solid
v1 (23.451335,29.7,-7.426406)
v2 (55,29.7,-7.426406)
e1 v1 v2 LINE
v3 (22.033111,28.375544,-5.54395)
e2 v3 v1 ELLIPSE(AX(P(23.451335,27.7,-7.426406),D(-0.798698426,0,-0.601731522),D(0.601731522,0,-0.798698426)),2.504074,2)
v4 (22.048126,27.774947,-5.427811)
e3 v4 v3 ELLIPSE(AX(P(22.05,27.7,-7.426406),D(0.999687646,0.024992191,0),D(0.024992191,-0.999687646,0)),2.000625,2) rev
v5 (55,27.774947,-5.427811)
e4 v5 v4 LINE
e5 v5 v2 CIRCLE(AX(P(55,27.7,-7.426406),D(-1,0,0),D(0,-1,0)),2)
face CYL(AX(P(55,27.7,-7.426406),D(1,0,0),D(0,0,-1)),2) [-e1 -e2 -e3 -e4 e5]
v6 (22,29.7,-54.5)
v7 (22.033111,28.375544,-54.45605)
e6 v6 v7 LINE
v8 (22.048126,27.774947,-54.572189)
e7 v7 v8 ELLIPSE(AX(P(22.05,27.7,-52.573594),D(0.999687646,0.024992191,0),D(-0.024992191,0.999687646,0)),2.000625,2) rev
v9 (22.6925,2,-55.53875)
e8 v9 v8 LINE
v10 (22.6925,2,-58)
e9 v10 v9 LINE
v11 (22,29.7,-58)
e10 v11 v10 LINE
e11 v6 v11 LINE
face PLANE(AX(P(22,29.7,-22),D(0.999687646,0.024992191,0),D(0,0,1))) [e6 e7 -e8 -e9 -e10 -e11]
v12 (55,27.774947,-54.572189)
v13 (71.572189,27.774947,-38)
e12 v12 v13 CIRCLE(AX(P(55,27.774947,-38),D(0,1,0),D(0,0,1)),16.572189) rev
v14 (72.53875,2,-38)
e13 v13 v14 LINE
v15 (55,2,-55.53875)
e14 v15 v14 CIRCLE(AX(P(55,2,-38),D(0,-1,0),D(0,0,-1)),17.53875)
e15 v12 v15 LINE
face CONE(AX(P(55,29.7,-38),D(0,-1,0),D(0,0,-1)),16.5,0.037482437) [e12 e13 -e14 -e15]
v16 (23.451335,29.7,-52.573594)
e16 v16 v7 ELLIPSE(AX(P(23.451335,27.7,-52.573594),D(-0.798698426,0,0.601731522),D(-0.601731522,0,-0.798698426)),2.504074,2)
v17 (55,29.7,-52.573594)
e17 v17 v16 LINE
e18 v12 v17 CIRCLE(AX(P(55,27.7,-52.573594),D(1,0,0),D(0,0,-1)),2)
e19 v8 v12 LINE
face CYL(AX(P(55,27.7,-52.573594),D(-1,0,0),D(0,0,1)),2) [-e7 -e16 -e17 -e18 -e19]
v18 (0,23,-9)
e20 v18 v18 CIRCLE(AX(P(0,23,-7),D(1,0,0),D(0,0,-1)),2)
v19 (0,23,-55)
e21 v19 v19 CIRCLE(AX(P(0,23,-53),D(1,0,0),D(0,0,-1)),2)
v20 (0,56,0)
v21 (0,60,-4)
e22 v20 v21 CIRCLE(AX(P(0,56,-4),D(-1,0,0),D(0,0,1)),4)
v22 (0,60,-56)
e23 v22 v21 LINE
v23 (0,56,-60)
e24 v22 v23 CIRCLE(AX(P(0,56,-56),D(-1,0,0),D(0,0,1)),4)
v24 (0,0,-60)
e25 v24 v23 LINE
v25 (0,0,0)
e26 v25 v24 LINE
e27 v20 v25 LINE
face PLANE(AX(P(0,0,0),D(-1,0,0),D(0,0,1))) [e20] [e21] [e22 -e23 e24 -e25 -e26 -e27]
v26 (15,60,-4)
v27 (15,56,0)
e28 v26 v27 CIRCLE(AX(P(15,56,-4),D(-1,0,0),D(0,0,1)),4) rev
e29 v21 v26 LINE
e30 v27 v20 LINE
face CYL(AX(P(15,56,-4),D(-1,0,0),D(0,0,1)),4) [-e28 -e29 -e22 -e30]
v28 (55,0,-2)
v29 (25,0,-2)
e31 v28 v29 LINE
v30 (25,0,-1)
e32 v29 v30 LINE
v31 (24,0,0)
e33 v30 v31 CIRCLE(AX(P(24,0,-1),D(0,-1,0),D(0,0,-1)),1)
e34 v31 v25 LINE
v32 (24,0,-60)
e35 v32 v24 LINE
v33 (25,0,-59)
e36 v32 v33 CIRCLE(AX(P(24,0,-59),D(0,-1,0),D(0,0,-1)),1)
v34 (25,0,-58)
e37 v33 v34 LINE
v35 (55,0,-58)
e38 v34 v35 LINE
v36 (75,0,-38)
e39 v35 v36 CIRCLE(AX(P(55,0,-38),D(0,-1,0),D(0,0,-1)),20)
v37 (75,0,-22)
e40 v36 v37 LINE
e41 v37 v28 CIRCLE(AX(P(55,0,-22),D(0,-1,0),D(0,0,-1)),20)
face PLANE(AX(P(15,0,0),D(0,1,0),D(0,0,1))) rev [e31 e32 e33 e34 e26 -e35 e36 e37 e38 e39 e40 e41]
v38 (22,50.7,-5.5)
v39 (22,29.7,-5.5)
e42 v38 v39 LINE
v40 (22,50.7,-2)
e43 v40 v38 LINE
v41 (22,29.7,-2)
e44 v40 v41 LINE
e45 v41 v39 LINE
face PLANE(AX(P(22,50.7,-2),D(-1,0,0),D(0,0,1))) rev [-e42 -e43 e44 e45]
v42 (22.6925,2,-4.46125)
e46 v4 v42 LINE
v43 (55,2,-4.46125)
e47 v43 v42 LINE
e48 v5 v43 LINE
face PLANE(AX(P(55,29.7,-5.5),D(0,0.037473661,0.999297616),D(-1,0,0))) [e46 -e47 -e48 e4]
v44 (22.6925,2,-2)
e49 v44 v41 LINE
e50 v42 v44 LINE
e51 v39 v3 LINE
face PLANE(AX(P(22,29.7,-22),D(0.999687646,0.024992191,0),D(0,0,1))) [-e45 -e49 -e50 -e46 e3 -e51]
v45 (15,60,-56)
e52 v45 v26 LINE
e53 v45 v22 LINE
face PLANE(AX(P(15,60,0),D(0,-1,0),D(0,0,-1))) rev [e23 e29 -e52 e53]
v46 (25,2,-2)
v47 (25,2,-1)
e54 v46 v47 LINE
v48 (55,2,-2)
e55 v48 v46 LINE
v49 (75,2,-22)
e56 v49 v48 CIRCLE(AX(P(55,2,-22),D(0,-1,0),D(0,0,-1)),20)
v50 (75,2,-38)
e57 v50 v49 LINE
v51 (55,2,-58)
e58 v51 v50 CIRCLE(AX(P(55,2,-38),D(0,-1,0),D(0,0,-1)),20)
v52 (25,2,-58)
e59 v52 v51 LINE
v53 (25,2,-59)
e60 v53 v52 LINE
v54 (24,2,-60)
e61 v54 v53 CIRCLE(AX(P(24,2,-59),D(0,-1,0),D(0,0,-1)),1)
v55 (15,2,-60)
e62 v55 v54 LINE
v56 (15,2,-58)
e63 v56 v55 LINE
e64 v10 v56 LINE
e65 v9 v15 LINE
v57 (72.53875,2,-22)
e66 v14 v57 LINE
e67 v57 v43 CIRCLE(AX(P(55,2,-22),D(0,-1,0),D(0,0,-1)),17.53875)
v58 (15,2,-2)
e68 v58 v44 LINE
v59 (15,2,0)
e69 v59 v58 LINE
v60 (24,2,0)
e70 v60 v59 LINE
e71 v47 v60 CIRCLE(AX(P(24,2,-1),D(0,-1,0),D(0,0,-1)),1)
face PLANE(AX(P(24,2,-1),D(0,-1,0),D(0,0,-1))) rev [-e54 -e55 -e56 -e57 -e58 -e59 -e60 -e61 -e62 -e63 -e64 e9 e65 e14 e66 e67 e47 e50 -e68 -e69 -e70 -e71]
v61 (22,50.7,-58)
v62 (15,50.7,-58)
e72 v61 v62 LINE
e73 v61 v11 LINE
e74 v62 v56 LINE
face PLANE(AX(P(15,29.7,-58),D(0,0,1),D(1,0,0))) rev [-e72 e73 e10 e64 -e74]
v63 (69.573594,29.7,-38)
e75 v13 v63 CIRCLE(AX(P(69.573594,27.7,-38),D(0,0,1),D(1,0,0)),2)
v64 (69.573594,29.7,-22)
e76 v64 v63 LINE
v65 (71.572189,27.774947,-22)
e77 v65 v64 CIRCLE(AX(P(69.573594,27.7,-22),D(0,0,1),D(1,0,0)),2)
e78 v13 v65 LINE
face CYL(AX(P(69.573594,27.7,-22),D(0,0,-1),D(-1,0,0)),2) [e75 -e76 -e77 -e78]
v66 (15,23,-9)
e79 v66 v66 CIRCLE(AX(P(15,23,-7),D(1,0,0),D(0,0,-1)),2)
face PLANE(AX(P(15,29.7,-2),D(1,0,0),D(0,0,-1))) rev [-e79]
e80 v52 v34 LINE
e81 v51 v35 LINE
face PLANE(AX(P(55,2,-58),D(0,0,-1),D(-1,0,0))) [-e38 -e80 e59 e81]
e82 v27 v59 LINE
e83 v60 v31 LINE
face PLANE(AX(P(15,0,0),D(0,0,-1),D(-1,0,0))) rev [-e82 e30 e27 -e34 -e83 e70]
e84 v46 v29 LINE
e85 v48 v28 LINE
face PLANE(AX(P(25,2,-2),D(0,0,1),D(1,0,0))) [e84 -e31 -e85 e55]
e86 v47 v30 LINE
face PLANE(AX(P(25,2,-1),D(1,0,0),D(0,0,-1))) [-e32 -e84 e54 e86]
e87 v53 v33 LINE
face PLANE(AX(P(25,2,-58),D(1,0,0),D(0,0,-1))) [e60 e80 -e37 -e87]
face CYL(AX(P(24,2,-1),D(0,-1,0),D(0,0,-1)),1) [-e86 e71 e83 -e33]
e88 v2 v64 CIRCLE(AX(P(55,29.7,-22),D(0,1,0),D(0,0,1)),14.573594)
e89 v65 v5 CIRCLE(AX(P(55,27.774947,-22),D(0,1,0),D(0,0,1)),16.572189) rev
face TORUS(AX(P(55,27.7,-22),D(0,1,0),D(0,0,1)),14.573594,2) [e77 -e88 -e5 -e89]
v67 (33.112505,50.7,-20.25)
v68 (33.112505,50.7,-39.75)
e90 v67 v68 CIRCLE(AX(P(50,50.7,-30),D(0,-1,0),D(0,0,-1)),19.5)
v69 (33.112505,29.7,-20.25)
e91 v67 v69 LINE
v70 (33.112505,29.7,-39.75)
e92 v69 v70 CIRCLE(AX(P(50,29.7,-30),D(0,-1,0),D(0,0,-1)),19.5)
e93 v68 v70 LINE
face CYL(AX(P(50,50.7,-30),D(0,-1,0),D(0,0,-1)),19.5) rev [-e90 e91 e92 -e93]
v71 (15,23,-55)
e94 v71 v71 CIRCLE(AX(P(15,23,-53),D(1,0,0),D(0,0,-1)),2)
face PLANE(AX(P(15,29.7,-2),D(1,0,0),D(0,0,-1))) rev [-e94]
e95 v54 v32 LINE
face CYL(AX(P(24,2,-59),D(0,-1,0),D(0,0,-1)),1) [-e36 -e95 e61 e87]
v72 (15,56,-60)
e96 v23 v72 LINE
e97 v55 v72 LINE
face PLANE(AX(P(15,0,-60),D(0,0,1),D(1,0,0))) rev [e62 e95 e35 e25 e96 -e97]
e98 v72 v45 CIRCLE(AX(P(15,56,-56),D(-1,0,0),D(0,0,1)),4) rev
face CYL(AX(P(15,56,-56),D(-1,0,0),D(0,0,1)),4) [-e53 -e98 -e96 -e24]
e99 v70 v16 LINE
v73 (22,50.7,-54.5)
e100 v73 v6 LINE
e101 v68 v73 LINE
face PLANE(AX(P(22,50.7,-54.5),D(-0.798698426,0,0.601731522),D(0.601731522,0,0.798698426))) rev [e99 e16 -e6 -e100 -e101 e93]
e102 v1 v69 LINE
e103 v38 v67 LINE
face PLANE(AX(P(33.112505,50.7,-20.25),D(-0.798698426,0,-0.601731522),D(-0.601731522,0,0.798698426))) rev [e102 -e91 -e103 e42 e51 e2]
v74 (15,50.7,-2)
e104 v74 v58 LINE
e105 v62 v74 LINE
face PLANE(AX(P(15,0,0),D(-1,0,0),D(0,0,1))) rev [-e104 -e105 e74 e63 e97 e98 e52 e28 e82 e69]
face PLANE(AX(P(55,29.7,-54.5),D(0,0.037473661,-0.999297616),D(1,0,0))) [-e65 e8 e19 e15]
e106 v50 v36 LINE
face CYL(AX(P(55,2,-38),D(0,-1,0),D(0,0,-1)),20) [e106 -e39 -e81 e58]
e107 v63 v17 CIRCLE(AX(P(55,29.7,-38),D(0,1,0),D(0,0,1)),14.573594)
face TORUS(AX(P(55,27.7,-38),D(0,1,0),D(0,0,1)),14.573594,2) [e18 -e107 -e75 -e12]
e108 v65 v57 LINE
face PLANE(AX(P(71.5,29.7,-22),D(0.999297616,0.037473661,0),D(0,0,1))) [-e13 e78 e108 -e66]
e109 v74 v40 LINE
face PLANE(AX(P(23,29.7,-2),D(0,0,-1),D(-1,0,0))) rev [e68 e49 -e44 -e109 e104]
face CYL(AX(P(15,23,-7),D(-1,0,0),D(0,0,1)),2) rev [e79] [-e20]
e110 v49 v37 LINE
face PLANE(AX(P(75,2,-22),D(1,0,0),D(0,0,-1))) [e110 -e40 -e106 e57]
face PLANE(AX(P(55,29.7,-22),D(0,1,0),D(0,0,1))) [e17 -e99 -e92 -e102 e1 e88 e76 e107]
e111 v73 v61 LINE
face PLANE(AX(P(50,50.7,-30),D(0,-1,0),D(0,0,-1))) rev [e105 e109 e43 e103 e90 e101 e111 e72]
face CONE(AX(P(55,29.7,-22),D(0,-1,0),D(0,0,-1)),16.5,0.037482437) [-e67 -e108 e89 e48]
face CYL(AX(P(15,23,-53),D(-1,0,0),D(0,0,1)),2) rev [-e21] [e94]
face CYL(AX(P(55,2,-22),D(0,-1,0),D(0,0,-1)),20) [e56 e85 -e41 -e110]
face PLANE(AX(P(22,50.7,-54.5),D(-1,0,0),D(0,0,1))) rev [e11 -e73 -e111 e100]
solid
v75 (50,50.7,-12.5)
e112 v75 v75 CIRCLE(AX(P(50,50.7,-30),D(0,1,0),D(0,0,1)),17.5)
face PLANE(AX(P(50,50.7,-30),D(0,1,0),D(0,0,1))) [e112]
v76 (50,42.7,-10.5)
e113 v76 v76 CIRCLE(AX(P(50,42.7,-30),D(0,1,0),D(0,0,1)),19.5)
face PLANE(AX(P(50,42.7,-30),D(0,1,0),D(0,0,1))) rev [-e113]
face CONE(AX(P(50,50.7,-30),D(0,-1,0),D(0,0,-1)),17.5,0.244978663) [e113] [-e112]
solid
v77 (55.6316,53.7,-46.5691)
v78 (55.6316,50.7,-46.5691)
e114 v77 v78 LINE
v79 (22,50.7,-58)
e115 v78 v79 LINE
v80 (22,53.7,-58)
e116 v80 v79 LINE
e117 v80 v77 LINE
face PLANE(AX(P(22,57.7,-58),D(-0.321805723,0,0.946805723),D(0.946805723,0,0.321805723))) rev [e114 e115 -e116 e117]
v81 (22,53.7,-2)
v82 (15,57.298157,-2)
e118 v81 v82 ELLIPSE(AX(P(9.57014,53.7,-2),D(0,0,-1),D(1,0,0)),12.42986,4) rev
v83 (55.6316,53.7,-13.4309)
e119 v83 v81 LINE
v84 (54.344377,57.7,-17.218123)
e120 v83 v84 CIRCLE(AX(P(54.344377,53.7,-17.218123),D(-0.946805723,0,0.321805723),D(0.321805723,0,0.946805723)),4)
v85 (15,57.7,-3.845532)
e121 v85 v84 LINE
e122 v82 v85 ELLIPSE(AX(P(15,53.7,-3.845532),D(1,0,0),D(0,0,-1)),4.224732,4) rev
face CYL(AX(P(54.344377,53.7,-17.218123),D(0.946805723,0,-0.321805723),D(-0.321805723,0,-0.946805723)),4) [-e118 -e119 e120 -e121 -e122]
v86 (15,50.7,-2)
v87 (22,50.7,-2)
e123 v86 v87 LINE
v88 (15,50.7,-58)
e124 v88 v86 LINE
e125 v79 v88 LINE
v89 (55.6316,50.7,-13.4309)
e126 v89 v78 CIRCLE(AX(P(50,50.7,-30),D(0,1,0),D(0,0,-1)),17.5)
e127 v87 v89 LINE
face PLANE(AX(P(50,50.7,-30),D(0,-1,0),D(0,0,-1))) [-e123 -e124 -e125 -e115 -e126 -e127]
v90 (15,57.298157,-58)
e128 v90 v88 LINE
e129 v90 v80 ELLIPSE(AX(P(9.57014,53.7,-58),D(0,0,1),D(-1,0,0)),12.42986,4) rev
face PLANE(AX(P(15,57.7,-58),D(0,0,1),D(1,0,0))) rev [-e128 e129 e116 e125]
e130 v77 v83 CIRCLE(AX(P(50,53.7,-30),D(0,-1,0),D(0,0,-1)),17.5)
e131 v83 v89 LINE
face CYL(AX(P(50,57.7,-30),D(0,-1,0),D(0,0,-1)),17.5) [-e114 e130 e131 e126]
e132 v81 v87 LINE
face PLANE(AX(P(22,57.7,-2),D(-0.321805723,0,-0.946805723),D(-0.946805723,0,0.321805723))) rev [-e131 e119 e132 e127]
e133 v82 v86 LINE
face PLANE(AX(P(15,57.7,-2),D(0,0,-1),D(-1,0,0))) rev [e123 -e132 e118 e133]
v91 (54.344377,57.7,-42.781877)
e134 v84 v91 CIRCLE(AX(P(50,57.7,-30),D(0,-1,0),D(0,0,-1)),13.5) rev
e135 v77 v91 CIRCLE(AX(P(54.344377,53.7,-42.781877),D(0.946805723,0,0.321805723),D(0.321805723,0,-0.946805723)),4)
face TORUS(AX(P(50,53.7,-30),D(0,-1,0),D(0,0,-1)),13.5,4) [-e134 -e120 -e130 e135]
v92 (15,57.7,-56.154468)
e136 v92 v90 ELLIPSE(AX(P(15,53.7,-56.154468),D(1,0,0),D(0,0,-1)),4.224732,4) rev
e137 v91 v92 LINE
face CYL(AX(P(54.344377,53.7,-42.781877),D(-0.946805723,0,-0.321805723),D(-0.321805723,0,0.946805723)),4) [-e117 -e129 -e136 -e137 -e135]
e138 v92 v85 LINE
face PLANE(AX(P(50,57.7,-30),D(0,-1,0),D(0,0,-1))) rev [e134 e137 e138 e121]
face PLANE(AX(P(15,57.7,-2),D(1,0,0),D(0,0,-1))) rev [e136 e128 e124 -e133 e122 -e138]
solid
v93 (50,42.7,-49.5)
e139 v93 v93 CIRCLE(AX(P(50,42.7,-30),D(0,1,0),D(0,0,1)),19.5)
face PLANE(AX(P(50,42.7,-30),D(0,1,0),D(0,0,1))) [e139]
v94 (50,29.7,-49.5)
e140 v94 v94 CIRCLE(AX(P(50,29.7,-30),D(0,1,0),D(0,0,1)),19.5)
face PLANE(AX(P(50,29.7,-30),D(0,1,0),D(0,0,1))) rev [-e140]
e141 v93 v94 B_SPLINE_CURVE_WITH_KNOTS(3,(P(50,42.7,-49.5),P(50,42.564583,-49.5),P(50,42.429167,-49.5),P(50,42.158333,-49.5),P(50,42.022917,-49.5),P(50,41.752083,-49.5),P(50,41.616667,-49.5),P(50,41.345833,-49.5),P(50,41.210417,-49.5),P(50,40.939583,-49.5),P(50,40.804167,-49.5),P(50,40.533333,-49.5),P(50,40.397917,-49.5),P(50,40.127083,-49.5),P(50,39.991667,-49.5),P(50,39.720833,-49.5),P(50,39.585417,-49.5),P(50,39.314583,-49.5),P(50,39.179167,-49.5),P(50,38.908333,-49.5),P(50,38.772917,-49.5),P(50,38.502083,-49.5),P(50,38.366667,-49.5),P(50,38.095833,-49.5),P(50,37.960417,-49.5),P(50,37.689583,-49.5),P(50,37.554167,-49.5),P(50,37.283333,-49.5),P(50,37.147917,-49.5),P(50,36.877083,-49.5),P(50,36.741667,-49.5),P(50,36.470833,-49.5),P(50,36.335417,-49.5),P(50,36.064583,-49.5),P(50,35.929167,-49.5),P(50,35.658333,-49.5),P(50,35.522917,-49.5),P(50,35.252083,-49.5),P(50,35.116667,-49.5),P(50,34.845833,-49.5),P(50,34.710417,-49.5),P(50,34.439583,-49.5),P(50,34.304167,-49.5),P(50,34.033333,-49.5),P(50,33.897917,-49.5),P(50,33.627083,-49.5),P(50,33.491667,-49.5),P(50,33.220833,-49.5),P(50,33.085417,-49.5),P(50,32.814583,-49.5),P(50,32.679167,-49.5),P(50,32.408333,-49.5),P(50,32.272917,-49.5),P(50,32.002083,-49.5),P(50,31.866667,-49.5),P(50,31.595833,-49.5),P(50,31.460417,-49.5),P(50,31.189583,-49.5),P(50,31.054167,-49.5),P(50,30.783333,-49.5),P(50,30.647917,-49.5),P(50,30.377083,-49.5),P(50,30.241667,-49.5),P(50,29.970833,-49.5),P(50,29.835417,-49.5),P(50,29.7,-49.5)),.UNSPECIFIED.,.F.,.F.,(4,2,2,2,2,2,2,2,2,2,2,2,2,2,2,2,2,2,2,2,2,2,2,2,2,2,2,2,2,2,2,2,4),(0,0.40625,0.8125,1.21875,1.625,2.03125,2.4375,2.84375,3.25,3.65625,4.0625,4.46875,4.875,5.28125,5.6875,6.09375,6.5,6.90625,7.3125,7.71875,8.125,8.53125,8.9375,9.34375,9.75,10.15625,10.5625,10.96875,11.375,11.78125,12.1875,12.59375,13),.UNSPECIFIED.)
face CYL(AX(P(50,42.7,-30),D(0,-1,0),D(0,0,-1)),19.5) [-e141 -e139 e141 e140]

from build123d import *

# Parameters (mm, degrees)
ESQUISSE1_W        = 60
ESQUISSE1_H        = 60
ESQUISSE1_R        = 2
BOSS_EXTRU_1_DEPTH = 15
BOSS_EXTRU_2_DEPTH = 2
BOSS_EXTRU_3_DEPTH = 27.7
CHANFREIN1_SIZE    = 1.5
CHANFREIN1_SIZE_2  = 40
CHANFREIN2_SIZE    = 1
CHANFREIN2_SIZE_2  = 40
BOSS_EXTRU_4_DEPTH = 21
ESQUISSE5_R        = 19.5
BOSS_EXTRU_5_DEPTH = 13
ESQUISSE6_R        = 19.5
BOSS_EXTRU_6_DEPTH = 8
CHANFREIN3_SIZE    = 8
CHANFREIN3_SIZE_2  = 2
BOSS_EXTRU_9_DEPTH = 7
CONG_3_R           = 2
CONG_4_R           = 4
CONG_5_R           = 4


with BuildPart() as part:
    # Esquisse1 → Boss.-Extru.1 (new body)
    with BuildSketch(Plane(origin=(0, 0, 0), x_dir=(0, 0, -1), z_dir=(1, 0, 0))):
        with Locations((30, 30)):
            Rectangle(ESQUISSE1_W, ESQUISSE1_H)
        with Locations((7, 23)):
            Circle(ESQUISSE1_R, mode=Mode.SUBTRACT)
        with Locations((53, 23)):
            Circle(ESQUISSE1_R, mode=Mode.SUBTRACT)
    extrude(amount=BOSS_EXTRU_1_DEPTH)

    # Esquisse2 → Boss.-Extru.2 (add)
    with BuildSketch(Plane.XZ):
        with BuildLine():
            Line((15, 0), (24, 0))
            ThreePointArc((24, 0), (24.707106781, -0.292893219), (25, -1))
            Line((25, -1), (25, -2))
            Line((25, -2), (55, -2))
            ThreePointArc((55, -2), (69.142135624, -7.857864376), (75, -22))
            Line((75, -22), (75, -38))
            ThreePointArc((75, -38), (69.142135624, -52.142135624), (55, -58))
            Line((55, -58), (25, -58))
            Line((25, -58), (25, -59))
            ThreePointArc((25, -59), (24.707106781, -59.707106781), (24, -60))
            Line((24, -60), (15, -60))
            Line((15, -60), (15, 0))
        make_face()
    extrude(amount=-BOSS_EXTRU_2_DEPTH)

    # Esquisse3 → Boss.-Extru.3 (add)
    with BuildSketch(Plane(origin=(0, 2, 0), x_dir=(1, 0, 0), z_dir=(0, 1, 0))):
        with BuildLine():
            Line((23, 2), (15, 2))
            Line((15, 2), (15, 58))
            Line((15, 58), (23, 58))
            Line((23, 58), (23, 56))
            Line((23, 56), (55, 56))
            ThreePointArc((55, 56), (67.727922061, 50.727922061), (73, 38))
            Line((73, 38), (73, 22))
            ThreePointArc((73, 22), (67.727922061, 9.272077939), (55, 4))
            Line((55, 4), (23, 4))
            Line((23, 4), (23, 2))
        make_face()
    extrude(amount=BOSS_EXTRU_3_DEPTH)

    # Chanfrein1
    # the kernel refuses this chamfer: 40, 1.5 mm, written as the material it takes off along each edge
    with BuildSketch(Plane(origin=(23, 29.7, -56), x_dir=(0, 0.7157643485721592, 0.6983418914207227), z_dir=(1, 0, 0))) as chanfrein1_piece_1_section:
        Polygon((CHANFREIN1_SIZE * 0.698341891421, CHANFREIN1_SIZE * 0.715764348572), (-CHANFREIN1_SIZE_2 * 0.715764348572, CHANFREIN1_SIZE_2 * 0.698341891421), (0, 0), align=None)
    chanfrein1_piece_1 = extrude(amount=32, mode=Mode.PRIVATE)
    chanfrein1_piece_1 = split(chanfrein1_piece_1, bisect_by=Plane(origin=(37.024131868, 2, -55.4897808), z_dir=(0, 1, 0)), keep=Keep.TOP, mode=Mode.PRIVATE)
    add(chanfrein1_piece_1, mode=Mode.SUBTRACT)
    with BuildSketch(Plane(origin=(55, 29.7, -38), x_dir=(0, 0, -1), z_dir=(-1, 0, 0))) as chanfrein1_piece_2_section:
        Polygon((18 - CHANFREIN1_SIZE, 0), (18, CHANFREIN1_SIZE_2), (18, 0), align=None)
    chanfrein1_piece_2 = revolve(axis=Axis((55, 29.7, -38), (0, -1, 0)), revolution_arc=90, mode=Mode.PRIVATE)
    chanfrein1_piece_2 = split(chanfrein1_piece_2, bisect_by=Plane(origin=(67.098576513, 2, -50.098576513), z_dir=(0, 1, 0)), keep=Keep.TOP, mode=Mode.PRIVATE)
    add(chanfrein1_piece_2, mode=Mode.SUBTRACT)
    with BuildSketch(Plane(origin=(55, 29.7, -4), x_dir=(0, 0.7157643485721598, -0.698341891420722), z_dir=(-1, 0, 0))) as chanfrein1_piece_3_section:
        Polygon((CHANFREIN1_SIZE * 0.698341891421, CHANFREIN1_SIZE * 0.715764348572), (-CHANFREIN1_SIZE_2 * 0.715764348572, CHANFREIN1_SIZE_2 * 0.698341891421), (0, 0), align=None)
    chanfrein1_piece_3 = extrude(amount=32, mode=Mode.PRIVATE)
    chanfrein1_piece_3 = split(chanfrein1_piece_3, bisect_by=Plane(origin=(52.691459865, 2, -4.656531492), z_dir=(0, 1, 0)), keep=Keep.TOP, mode=Mode.PRIVATE)
    add(chanfrein1_piece_3, mode=Mode.SUBTRACT)
    with BuildSketch(Plane(origin=(73, 29.7, -38), x_dir=(-0.6983418914207212, 0.7157643485721609, 0), z_dir=(0, 0, 1))) as chanfrein1_piece_4_section:
        Polygon((CHANFREIN1_SIZE * 0.698341891421, CHANFREIN1_SIZE * 0.715764348572), (-CHANFREIN1_SIZE_2 * 0.715764348572, CHANFREIN1_SIZE_2 * 0.698341891421), (0, 0), align=None)
    chanfrein1_piece_4 = extrude(amount=16, mode=Mode.PRIVATE)
    chanfrein1_piece_4 = split(chanfrein1_piece_4, bisect_by=Plane(origin=(72.334165333, 2, -35.67535471), z_dir=(0, 1, 0)), keep=Keep.TOP, mode=Mode.PRIVATE)
    add(chanfrein1_piece_4, mode=Mode.SUBTRACT)
    with BuildSketch(Plane(origin=(55, 29.7, -22), x_dir=(1, 0, 0), z_dir=(0, 0, -1))) as chanfrein1_piece_5_section:
        Polygon((18 - CHANFREIN1_SIZE, 0), (18, CHANFREIN1_SIZE_2), (18, 0), align=None)
    chanfrein1_piece_5 = revolve(axis=Axis((55, 29.7, -22), (0, -1, 0)), revolution_arc=90, mode=Mode.PRIVATE)
    chanfrein1_piece_5 = split(chanfrein1_piece_5, bisect_by=Plane(origin=(67.098576513, 2, -9.901423487), z_dir=(0, 1, 0)), keep=Keep.TOP, mode=Mode.PRIVATE)
    add(chanfrein1_piece_5, mode=Mode.SUBTRACT)

    # Chanfrein2
    # the kernel refuses this chamfer: 40, 1 mm, written as the material it takes off along each edge
    with BuildSketch(Plane(origin=(23, 29.7, 49.498798633), x_dir=(-0.5451034374320658, 0.8383687986201215, 0), z_dir=(0, 0, -1))) as chanfrein2_piece_1_section:
        Polygon((CHANFREIN2_SIZE * 0.545103437432, -CHANFREIN2_SIZE * 0.83836879862), (-CHANFREIN2_SIZE_2 * 0.83836879862, -CHANFREIN2_SIZE_2 * 0.545103437432), (0, 0), align=None)
    chanfrein2_piece_1 = extrude(amount=211.497597266, mode=Mode.PRIVATE)
    chanfrein2_piece_1 = split(chanfrein2_piece_1, bisect_by=Plane(origin=(22.633717158, 2, -3.549424262), z_dir=(0, 1, 0)), keep=Keep.TOP, mode=Mode.PRIVATE)
    chanfrein2_piece_1 = split(chanfrein2_piece_1, bisect_by=Plane(origin=(22.633717158, 18.944605509, -5.096672707), z_dir=(0, 0.03747366058909413, 0.9992976157091807)), keep=Keep.TOP, mode=Mode.PRIVATE)
    add(chanfrein2_piece_1, mode=Mode.SUBTRACT)
    with BuildSketch(Plane(origin=(23, 29.7, 49.498798633), x_dir=(-0.5451034374320658, 0.8383687986201215, 0), z_dir=(0, 0, -1))) as chanfrein2_piece_2_section:
        Polygon((CHANFREIN2_SIZE * 0.545103437432, -CHANFREIN2_SIZE * 0.83836879862), (-CHANFREIN2_SIZE_2 * 0.83836879862, -CHANFREIN2_SIZE_2 * 0.545103437432), (0, 0), align=None)
    chanfrein2_piece_2 = extrude(amount=211.497597266, mode=Mode.PRIVATE)
    chanfrein2_piece_2 = split(chanfrein2_piece_2, bisect_by=Plane(origin=(22.633717158, 2, -56.450575738), z_dir=(0, 1, 0)), keep=Keep.TOP, mode=Mode.PRIVATE)
    chanfrein2_piece_2 = split(chanfrein2_piece_2, bisect_by=Plane(origin=(22.633717158, 18.944605509, -54.903327293), z_dir=(0, 0.03747366058909413, -0.9992976157091807)), keep=Keep.TOP, mode=Mode.PRIVATE)
    add(chanfrein2_piece_2, mode=Mode.SUBTRACT)
    with BuildSketch(Plane(origin=(23, 29.7, 101.998798633), x_dir=(-0.5451034374320658, 0.8383687986201215, -1.1066265363005755e-15), z_dir=(0, 0, -1))) as chanfrein2_piece_3_section:
        Polygon((CHANFREIN2_SIZE * 0.545103437432, -CHANFREIN2_SIZE * 0.83836879862), (-CHANFREIN2_SIZE_2 * 0.83836879862, -CHANFREIN2_SIZE_2 * 0.545103437432), (0, 0), align=None)
    chanfrein2_piece_3 = extrude(amount=211.497597266, mode=Mode.PRIVATE)
    chanfrein2_piece_3 = split(chanfrein2_piece_3, bisect_by=Plane(origin=(22.633717158, 2, -3.549424262), z_dir=(0, 1, 0)), keep=Keep.TOP, mode=Mode.PRIVATE)
    chanfrein2_piece_3 = split(chanfrein2_piece_3, bisect_by=Plane(origin=(22.633717158, 18.944605509, -5.096672707), z_dir=(0, 0.03747366058909413, 0.9992976157091807)), keep=Keep.TOP, mode=Mode.PRIVATE)
    add(chanfrein2_piece_3, mode=Mode.SUBTRACT)
    with BuildSketch(Plane(origin=(23, 29.7, 101.998798633), x_dir=(-0.5451034374320658, 0.8383687986201215, -1.1066265363005755e-15), z_dir=(0, 0, -1))) as chanfrein2_piece_4_section:
        Polygon((CHANFREIN2_SIZE * 0.545103437432, -CHANFREIN2_SIZE * 0.83836879862), (-CHANFREIN2_SIZE_2 * 0.83836879862, -CHANFREIN2_SIZE_2 * 0.545103437432), (0, 0), align=None)
    chanfrein2_piece_4 = extrude(amount=211.497597266, mode=Mode.PRIVATE)
    chanfrein2_piece_4 = split(chanfrein2_piece_4, bisect_by=Plane(origin=(22.633717158, 2, -56.450575738), z_dir=(0, 1, 0)), keep=Keep.TOP, mode=Mode.PRIVATE)
    chanfrein2_piece_4 = split(chanfrein2_piece_4, bisect_by=Plane(origin=(22.633717158, 18.944605509, -54.903327293), z_dir=(0, 0.03747366058909413, -0.9992976157091807)), keep=Keep.TOP, mode=Mode.PRIVATE)
    add(chanfrein2_piece_4, mode=Mode.SUBTRACT)

    # Esquisse4 → Boss.-Extru.4 (add)
    with BuildSketch(Plane(origin=(0, 29.7, 0), x_dir=(1, 0, 0), z_dir=(0, 1, 0))):
        with BuildLine():
            Line((22, 54.5), (33.112504626, 39.75))
            ThreePointArc((33.112504626, 39.75), (30.5, 30), (33.112504626, 20.25))
            Line((33.112504626, 20.25), (22, 5.5))
            Line((22, 5.5), (22, 2))
            Line((22, 2), (15, 2))
            Line((15, 2), (15, 58))
            Line((15, 58), (22, 58))
            Line((22, 58), (22, 54.5))
        make_face()
    extrude(amount=BOSS_EXTRU_4_DEPTH)

    # Congé3
    # the kernel refuses this fillet: 2 mm, written as the material it takes off along each edge
    with BuildSketch(Plane(origin=(55, 29.7, -22), x_dir=(1, 0, 0), z_dir=(0, 0, -1))) as cong_3_piece_1:
        with BuildLine():
            CenterArc((16.5 - CONG_3_R * 0.963202877981, CONG_3_R), CONG_3_R, 270, 87.852414572)
            Line((16.5 - CONG_3_R * 0.963202877981, 0), (16.5, 0))
            Line((16.5, 0), (16.5 + CONG_3_R * 0.0360947377279, CONG_3_R * 0.962526339411))
        make_face()
    revolve(axis=Axis((55, 29.7, -22), (0, -1, 0)), revolution_arc=90, mode=Mode.SUBTRACT)
    with BuildSketch(Plane(origin=(71.5, 29.7, -38), x_dir=(0.03747366058909278, -0.9992976157091809, 0), z_dir=(0, 0, 1))) as cong_3_piece_2:
        with BuildLine():
            CenterArc((CONG_3_R * 0.963202877981, -CONG_3_R), CONG_3_R, 90, 87.852414572)
            Line((-CONG_3_R * 0.0360947377279, -CONG_3_R * 0.962526339411), (0, 0))
            Line((0, 0), (CONG_3_R * 0.963202877981, 0))
        make_face()
    extrude(amount=16, mode=Mode.SUBTRACT)
    with BuildSketch(Plane(origin=(55, 29.7, -5.5), x_dir=(1.1487780265352356e-15, -0.9992976157091819, 0.037473660589062784), z_dir=(-1, 0, 0))) as cong_3_piece_3_section:
        with BuildLine():
            CenterArc((CONG_3_R * 0.963202877981, -CONG_3_R), CONG_3_R, 90, 87.852414572)
            Line((-CONG_3_R * 0.0360947377279, -CONG_3_R * 0.962526339411), (0, 0))
            Line((0, 0), (CONG_3_R * 0.963202877981, 0))
        make_face()
    cong_3_piece_3 = extrude(amount=37.81601439, mode=Mode.PRIVATE)
    cong_3_piece_3 = split(cong_3_piece_3, bisect_by=Plane(origin=(22.021307393, 28.847704283, -5.913963971), z_dir=(0.9996876464081229, 0.024992191160203014, 0)), keep=Keep.TOP, mode=Mode.PRIVATE)
    cong_3_piece_3 = split(cong_3_piece_3, bisect_by=Plane(origin=(28.231231543, 29.263672501, -13.770922565), z_dir=(0.7986984257525773, 0, 0.6017315221096157)), keep=Keep.TOP, mode=Mode.PRIVATE)
    add(cong_3_piece_3, mode=Mode.SUBTRACT)
    with BuildSketch(Plane(origin=(55, 29.7, -38), x_dir=(0, 0, -1), z_dir=(-1, 0, 0))) as cong_3_piece_4:
        with BuildLine():
            CenterArc((16.5 - CONG_3_R * 0.963202877981, CONG_3_R), CONG_3_R, 270, 87.852414572)
            Line((16.5 - CONG_3_R * 0.963202877981, 0), (16.5, 0))
            Line((16.5, 0), (16.5 + CONG_3_R * 0.0360947377279, CONG_3_R * 0.962526339411))
        make_face()
    revolve(axis=Axis((55, 29.7, -38), (0, -1, 0)), revolution_arc=90, mode=Mode.SUBTRACT)
    with BuildSketch(Plane(origin=(17.18398561, 29.7, -54.5), x_dir=(1.1457522722959319e-15, -0.9992976157091807, -0.03747366058909278), z_dir=(1, 0, 0))) as cong_3_piece_5_section:
        with BuildLine():
            CenterArc((CONG_3_R * 0.963202877981, -CONG_3_R), CONG_3_R, 90, 87.852414572)
            Line((-CONG_3_R * 0.0360947377279, -CONG_3_R * 0.962526339411), (0, 0))
            Line((0, 0), (CONG_3_R * 0.963202877981, 0))
        make_face()
    cong_3_piece_5 = extrude(amount=37.81601439, mode=Mode.PRIVATE)
    cong_3_piece_5 = split(cong_3_piece_5, bisect_by=Plane(origin=(22.021307393, 28.847704283, -54.086036029), z_dir=(0.9996876464081229, 0.024992191160203014, 0)), keep=Keep.TOP, mode=Mode.PRIVATE)
    cong_3_piece_5 = split(cong_3_piece_5, bisect_by=Plane(origin=(28.231231543, 29.263672501, -46.229077435), z_dir=(0.798698425752577, 0, -0.6017315221096161)), keep=Keep.TOP, mode=Mode.PRIVATE)
    add(cong_3_piece_5, mode=Mode.SUBTRACT)

    # Congé5
    cong_5_edges = [part.edges().sort_by_distance(p)[0] for p in [
        (7.5, 60, 0),
        (7.5, 60, -60),
    ]]
    fillet(cong_5_edges, radius=CONG_5_R)


with BuildPart() as body_2:
    # Esquisse5 → Boss.-Extru.5 (new body)
    with BuildSketch(Plane(origin=(0, 29.7, 0), x_dir=(1, 0, 0), z_dir=(0, 1, 0))):
        with Locations(Location((50, 30, 0), (0, 0, 90))):
            Circle(ESQUISSE5_R)
    extrude(amount=BOSS_EXTRU_5_DEPTH)


with BuildPart() as body_3:
    # Esquisse6 → Boss.-Extru.6 (new body)
    with BuildSketch(Plane(origin=(0, 42.7, 0), x_dir=(1, 0, 0), z_dir=(0, 1, 0))):
        with Locations(Location((50, 30, 0), (0, 0, 270))):
            Circle(ESQUISSE6_R)
    extrude(amount=BOSS_EXTRU_6_DEPTH)

    # Chanfrein3
    # the kernel refuses this chamfer: 8, 2 mm, written as the material it takes off along each edge
    with BuildSketch(Plane(origin=(50, 50.7, -30), x_dir=(0, 0, 1), z_dir=(-1, 0, 0))) as chanfrein3_piece_1:
        Polygon((19.5, -CHANFREIN3_SIZE), (19.5 - CHANFREIN3_SIZE_2, 0), (19.5, 0), align=None)
    revolve(axis=Axis((50, 50.7, -30), (0, 1, 0)), mode=Mode.SUBTRACT)


with BuildPart() as body_4:
    # Esquisse8 → Boss.-Extru.9 (new body)
    with BuildSketch(Plane(origin=(0, 50.7, 0), x_dir=(1, 0, 0), z_dir=(0, 1, 0))):
        with BuildLine():
            Line((15, 2), (22, 2))
            Line((22, 2), (55.631600149, 13.430899851))
            ThreePointArc((55.631600149, 13.430899851), (67.5, 30), (55.631600149, 46.569100149))
            Line((55.631600149, 46.569100149), (22, 58))
            Line((22, 58), (15, 58))
            Line((15, 58), (15, 2))
        make_face()
    extrude(amount=BOSS_EXTRU_9_DEPTH)

    # Congé4
    cong_4_edges = [body_4.edges().sort_by_distance(p)[0] for p in [
        (38.815800075, 57.7, -7.715449925),
        (38.815800075, 57.7, -52.284550075),
        (67.5, 57.7, -30),
    ]]
    fillet(cong_4_edges, radius=CONG_4_R)


solid = Compound([part.part, body_2.part, body_3.part, body_4.part])
